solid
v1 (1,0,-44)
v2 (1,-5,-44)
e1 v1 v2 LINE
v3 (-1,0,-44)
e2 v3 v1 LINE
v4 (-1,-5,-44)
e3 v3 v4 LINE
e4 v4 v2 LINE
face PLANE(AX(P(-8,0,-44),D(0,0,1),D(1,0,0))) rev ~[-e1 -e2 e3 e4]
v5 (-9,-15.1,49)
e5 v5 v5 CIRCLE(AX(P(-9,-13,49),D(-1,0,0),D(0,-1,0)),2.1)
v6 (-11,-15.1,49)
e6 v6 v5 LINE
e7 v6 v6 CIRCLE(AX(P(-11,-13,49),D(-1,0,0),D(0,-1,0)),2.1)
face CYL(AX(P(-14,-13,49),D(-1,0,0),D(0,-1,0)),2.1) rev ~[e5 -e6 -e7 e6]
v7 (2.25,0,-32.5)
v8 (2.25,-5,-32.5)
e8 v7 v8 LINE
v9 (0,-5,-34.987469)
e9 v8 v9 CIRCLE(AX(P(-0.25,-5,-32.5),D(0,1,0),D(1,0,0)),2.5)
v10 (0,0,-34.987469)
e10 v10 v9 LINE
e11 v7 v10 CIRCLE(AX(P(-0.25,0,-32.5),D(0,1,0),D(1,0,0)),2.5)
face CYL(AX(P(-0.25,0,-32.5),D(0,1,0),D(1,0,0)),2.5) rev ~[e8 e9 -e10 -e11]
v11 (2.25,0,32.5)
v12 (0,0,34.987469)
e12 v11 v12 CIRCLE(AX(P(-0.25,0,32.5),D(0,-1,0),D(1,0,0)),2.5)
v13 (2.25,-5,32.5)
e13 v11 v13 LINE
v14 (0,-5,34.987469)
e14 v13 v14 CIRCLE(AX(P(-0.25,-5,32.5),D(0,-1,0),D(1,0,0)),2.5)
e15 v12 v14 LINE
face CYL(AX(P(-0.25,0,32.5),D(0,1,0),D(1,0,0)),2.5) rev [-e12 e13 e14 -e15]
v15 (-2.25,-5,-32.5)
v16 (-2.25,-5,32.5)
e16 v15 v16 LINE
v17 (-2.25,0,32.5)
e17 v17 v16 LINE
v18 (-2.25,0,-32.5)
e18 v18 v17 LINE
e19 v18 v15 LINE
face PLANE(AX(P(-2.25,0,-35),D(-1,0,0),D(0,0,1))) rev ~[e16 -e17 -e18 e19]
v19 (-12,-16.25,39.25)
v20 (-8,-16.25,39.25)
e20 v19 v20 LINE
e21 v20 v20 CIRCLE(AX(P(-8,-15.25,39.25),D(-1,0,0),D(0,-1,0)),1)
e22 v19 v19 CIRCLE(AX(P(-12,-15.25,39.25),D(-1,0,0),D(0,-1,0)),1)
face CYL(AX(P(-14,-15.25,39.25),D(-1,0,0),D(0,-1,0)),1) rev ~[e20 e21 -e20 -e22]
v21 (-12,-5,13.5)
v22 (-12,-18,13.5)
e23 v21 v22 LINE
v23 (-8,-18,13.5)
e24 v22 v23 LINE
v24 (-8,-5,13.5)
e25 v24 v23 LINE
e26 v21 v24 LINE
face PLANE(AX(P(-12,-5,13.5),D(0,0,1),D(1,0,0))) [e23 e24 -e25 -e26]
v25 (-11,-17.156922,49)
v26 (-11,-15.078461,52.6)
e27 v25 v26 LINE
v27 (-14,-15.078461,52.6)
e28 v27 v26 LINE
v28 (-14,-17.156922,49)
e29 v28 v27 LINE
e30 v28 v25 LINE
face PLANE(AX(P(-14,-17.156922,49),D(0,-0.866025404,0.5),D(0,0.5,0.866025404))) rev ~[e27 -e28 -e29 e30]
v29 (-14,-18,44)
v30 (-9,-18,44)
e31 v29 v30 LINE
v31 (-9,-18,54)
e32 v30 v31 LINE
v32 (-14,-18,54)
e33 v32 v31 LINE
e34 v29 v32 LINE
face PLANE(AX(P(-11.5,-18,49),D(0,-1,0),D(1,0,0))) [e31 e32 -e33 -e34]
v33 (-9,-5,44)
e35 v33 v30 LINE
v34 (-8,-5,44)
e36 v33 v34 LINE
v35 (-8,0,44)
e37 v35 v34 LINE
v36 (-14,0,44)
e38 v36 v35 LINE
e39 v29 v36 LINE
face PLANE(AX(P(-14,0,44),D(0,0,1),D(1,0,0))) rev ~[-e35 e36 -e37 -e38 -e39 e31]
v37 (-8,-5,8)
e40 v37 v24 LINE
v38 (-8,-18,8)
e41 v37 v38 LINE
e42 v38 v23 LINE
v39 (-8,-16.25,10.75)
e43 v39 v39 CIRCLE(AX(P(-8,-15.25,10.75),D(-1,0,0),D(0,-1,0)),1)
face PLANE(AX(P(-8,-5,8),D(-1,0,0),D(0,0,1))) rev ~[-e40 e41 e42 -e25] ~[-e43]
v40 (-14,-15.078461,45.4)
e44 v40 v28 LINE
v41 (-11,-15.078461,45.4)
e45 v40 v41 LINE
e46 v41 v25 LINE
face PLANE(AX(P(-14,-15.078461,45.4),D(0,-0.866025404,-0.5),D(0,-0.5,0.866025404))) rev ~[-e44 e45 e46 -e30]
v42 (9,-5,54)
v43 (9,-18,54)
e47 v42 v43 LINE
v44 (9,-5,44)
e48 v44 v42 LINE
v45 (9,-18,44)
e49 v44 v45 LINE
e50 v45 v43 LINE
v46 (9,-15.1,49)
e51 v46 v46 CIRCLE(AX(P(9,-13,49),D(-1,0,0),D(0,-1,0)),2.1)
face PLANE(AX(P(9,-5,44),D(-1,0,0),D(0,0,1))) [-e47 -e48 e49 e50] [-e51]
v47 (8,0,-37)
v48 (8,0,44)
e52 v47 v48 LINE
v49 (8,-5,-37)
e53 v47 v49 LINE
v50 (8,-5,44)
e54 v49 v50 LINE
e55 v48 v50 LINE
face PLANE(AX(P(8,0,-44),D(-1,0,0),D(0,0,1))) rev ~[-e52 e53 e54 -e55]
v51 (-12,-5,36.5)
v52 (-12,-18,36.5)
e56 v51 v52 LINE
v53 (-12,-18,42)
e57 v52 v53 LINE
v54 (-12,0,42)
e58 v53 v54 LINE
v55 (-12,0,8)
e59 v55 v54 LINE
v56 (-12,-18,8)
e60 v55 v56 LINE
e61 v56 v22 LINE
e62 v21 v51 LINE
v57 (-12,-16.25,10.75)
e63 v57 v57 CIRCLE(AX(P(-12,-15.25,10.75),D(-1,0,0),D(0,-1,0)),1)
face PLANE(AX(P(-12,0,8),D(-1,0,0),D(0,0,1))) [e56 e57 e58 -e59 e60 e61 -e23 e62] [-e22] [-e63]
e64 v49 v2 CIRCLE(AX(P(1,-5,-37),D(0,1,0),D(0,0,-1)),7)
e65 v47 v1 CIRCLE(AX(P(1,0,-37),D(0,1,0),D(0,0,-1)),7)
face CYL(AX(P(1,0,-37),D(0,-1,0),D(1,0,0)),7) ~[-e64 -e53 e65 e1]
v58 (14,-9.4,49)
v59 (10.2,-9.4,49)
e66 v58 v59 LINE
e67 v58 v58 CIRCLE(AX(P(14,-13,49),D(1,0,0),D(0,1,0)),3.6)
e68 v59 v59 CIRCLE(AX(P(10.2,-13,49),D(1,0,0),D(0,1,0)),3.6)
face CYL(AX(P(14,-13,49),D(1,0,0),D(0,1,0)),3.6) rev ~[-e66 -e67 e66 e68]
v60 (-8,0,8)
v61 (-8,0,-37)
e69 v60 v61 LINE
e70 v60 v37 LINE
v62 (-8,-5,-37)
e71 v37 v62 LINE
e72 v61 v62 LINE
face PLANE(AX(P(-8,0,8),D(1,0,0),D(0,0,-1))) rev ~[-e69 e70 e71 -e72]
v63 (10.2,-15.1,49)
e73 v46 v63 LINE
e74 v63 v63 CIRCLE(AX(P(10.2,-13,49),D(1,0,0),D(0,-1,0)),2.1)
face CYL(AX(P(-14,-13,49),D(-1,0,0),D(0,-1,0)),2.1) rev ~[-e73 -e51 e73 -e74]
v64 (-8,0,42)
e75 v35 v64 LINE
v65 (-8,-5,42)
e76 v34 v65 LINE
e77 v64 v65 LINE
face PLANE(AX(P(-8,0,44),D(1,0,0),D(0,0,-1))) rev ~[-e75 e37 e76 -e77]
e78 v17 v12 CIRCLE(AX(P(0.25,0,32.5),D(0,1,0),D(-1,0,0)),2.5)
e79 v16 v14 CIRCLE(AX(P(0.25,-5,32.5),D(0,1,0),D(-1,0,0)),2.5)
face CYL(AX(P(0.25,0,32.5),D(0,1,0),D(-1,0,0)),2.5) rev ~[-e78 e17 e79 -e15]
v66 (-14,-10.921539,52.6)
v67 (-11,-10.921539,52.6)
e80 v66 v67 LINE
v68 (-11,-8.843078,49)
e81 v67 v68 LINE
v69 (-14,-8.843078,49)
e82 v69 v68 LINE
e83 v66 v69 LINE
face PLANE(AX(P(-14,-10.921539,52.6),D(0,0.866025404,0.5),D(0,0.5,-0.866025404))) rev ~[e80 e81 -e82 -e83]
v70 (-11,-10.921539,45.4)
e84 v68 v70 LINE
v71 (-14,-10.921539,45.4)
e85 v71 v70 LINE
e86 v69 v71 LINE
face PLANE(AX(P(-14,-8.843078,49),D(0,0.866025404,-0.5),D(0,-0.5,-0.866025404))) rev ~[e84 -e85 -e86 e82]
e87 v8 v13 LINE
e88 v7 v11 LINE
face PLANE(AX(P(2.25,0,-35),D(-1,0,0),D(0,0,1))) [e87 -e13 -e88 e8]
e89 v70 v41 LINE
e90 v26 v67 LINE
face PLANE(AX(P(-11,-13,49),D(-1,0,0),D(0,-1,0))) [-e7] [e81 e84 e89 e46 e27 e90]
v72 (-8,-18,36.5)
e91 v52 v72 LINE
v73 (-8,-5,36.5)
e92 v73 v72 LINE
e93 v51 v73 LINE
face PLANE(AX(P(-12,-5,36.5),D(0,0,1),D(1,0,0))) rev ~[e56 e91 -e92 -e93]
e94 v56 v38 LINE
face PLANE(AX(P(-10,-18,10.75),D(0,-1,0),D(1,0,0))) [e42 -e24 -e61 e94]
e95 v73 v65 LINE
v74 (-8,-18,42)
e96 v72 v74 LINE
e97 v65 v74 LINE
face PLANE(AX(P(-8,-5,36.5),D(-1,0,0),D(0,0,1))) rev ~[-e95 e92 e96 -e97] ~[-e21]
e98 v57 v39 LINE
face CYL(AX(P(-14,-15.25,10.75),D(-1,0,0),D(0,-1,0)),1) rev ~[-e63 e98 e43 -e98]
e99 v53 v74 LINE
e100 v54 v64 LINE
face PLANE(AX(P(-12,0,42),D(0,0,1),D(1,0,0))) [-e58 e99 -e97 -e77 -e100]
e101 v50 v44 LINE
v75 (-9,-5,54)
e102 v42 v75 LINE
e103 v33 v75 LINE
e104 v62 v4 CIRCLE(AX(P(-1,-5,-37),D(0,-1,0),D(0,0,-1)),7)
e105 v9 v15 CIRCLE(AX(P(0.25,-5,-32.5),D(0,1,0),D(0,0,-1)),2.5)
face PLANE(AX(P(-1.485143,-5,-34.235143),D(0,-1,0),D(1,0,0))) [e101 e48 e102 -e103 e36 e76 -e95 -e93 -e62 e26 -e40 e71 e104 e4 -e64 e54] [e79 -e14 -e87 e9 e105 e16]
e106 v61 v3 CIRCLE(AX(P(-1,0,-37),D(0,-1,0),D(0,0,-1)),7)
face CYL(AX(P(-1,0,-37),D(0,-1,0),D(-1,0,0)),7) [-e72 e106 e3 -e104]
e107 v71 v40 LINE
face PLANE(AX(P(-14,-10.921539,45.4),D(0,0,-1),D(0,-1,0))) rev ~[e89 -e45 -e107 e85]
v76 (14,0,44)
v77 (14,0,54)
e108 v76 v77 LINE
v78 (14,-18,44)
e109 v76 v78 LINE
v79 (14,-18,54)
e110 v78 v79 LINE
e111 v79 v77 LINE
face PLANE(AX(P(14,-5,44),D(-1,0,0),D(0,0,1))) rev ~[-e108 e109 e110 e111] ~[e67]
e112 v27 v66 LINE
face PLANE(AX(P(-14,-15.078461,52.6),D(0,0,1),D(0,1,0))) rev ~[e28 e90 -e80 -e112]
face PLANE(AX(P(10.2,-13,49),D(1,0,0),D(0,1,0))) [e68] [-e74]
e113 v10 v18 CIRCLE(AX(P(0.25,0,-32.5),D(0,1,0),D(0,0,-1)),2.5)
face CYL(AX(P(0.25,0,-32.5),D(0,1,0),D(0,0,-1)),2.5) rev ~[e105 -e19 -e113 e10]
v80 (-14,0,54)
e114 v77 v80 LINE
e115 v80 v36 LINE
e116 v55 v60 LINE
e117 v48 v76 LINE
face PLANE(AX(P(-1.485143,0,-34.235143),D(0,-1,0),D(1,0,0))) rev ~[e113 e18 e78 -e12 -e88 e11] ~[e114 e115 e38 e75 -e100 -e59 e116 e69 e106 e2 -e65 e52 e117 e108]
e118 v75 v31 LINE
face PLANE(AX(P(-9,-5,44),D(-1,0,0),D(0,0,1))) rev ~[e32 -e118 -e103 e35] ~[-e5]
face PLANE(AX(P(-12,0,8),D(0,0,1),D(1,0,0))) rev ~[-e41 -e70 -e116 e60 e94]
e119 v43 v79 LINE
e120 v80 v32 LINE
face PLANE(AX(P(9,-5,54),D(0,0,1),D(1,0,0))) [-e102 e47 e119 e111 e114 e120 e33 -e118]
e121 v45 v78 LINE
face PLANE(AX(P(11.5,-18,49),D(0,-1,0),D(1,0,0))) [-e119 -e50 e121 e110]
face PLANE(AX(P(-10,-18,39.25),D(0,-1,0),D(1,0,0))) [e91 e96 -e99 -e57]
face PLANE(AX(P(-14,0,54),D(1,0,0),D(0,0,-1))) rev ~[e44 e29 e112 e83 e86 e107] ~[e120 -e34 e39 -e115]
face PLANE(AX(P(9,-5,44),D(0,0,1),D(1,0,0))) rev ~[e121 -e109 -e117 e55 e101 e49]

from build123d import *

# Parameters (mm, degrees)
F0_W         = 4.5
F0_H         = 70
F0_W_2       = 4
F0_H_2       = 34
F1_DEPTH     = 5
F2_W         = 5
F2_H         = 10
F2_W_2       = 4
F2_H_2       = 5.5
F3_DEPTH     = 13
F4_R         = 2.1
F4_R_2       = 1
F5_DEPTH     = 28.001
F6_R         = 2.1
F7_DEPTH     = 3
F8_R         = 3.6
F8_R_2       = 2.1
F9_DEPTH     = 3.8
F10_R        = 7
F11_T1_DEPTH = 5


# Not quite as in the source:
# - a fillet or chamfer that OpenCascade refuses, or shapes differently, is made with other operations: its cross-section is extruded or revolved along the edge and cut away or added


with BuildPart() as f1:
    # F0 (on Front) → F1 (new body)
    with BuildSketch(Plane.XZ):
        Polygon((-8, -44), (8, -44), (8, 44), (-8, 44), (-8, 42), (-8, 8), align=None)
        Rectangle(F0_W, F0_H, mode=Mode.SUBTRACT)
        Polygon((-8, 44), (8, 44), (14, 44), (14, 54), (-14, 54), (-14, 44), align=None)
        with Locations((-10, 25)):
            Rectangle(F0_W_2, F0_H_2)
    extrude(amount=F1_DEPTH)

    # F2 (on face) → F3 (join)
    with BuildSketch(Plane.XZ.offset(5)):
        with Locations((11.5, 49)):
            Rectangle(F2_W, F2_H)
        with Locations((-11.5, 49)):
            Rectangle(F2_W, F2_H)
        with Locations((-10, 10.75)):
            Rectangle(F2_W_2, F2_H_2)
        with Locations((-10, 39.25)):
            Rectangle(F2_W_2, F2_H_2)
    extrude(amount=F3_DEPTH)

    # F4 (on face) → F5 (cut, through all)
    with BuildSketch(Plane(origin=(-14, 0, 0), x_dir=(0, -1, 0), z_dir=(-1, 0, 0))):
        with Locations((13, 49)):
            Circle(F4_R)
        with Locations((15.25, 39.25)):
            Circle(F4_R_2)
        with Locations((15.25, 10.75)):
            Circle(F4_R_2)
    extrude(amount=-F5_DEPTH, mode=Mode.SUBTRACT)

    # F6 (on face) → F7 (cut)
    with BuildSketch(Plane(origin=(-14, 0, 0), x_dir=(0, -1, 0), z_dir=(-1, 0, 0))):
        Polygon((15.0784609691, 45.4), (17.1569219382, 49), (15.0784609691, 52.6), (10.9215390309, 52.6), (8.8430780618, 49), (10.9215390309, 45.4), align=None)
        with Locations((13, 49)):
            Circle(F6_R, mode=Mode.SUBTRACT)
    extrude(amount=-F7_DEPTH, mode=Mode.SUBTRACT)

    # F8 (on face) → F9 (cut)
    with BuildSketch(Plane.YZ.offset(14)):
        with Locations((-13, 49)):
            Circle(F8_R)
        with Locations((-13, 49)):
            Circle(F8_R_2, mode=Mode.SUBTRACT)
    extrude(amount=-F9_DEPTH, mode=Mode.SUBTRACT)

    # F10
    f10_edges = [f1.edges().sort_by_distance(p)[0] for p in [
        (8, -2.5, -44),
        (-8, -2.5, -44),
    ]]
    fillet(f10_edges, radius=F10_R)

    # F11: fillet of radius 2.5 on 4 edges, made by hand

    # F11_s2 → F11_t1 (join)
    with BuildSketch(Plane.XZ):
        with BuildLine():
            ThreePointArc((0.25, -35), (-1.517766953, -34.267766953), (-2.25, -32.5))
            Line((-2.25, -32.5), (-2.25, -35))
            Line((-2.25, -35), (0.25, -35))
        make_face()
        with BuildLine():
            ThreePointArc((2.25, -32.5), (1.517766953, -34.267766953), (-0.25, -35))
            Line((-0.25, -35), (2.25, -35))
            Line((2.25, -35), (2.25, -32.5))
        make_face()
        with BuildLine():
            ThreePointArc((-2.25, 32.5), (-1.517766953, 34.267766953), (0.25, 35))
            Line((0.25, 35), (-2.25, 35))
            Line((-2.25, 35), (-2.25, 32.5))
        make_face()
        with BuildLine():
            ThreePointArc((2.25, 32.5), (1.517766953, 34.267766953), (-0.25, 35))
            Line((-0.25, 35), (2.25, 35))
            Line((2.25, 35), (2.25, 32.5))
        make_face()
    extrude(amount=F11_T1_DEPTH)


solid = f1.part
